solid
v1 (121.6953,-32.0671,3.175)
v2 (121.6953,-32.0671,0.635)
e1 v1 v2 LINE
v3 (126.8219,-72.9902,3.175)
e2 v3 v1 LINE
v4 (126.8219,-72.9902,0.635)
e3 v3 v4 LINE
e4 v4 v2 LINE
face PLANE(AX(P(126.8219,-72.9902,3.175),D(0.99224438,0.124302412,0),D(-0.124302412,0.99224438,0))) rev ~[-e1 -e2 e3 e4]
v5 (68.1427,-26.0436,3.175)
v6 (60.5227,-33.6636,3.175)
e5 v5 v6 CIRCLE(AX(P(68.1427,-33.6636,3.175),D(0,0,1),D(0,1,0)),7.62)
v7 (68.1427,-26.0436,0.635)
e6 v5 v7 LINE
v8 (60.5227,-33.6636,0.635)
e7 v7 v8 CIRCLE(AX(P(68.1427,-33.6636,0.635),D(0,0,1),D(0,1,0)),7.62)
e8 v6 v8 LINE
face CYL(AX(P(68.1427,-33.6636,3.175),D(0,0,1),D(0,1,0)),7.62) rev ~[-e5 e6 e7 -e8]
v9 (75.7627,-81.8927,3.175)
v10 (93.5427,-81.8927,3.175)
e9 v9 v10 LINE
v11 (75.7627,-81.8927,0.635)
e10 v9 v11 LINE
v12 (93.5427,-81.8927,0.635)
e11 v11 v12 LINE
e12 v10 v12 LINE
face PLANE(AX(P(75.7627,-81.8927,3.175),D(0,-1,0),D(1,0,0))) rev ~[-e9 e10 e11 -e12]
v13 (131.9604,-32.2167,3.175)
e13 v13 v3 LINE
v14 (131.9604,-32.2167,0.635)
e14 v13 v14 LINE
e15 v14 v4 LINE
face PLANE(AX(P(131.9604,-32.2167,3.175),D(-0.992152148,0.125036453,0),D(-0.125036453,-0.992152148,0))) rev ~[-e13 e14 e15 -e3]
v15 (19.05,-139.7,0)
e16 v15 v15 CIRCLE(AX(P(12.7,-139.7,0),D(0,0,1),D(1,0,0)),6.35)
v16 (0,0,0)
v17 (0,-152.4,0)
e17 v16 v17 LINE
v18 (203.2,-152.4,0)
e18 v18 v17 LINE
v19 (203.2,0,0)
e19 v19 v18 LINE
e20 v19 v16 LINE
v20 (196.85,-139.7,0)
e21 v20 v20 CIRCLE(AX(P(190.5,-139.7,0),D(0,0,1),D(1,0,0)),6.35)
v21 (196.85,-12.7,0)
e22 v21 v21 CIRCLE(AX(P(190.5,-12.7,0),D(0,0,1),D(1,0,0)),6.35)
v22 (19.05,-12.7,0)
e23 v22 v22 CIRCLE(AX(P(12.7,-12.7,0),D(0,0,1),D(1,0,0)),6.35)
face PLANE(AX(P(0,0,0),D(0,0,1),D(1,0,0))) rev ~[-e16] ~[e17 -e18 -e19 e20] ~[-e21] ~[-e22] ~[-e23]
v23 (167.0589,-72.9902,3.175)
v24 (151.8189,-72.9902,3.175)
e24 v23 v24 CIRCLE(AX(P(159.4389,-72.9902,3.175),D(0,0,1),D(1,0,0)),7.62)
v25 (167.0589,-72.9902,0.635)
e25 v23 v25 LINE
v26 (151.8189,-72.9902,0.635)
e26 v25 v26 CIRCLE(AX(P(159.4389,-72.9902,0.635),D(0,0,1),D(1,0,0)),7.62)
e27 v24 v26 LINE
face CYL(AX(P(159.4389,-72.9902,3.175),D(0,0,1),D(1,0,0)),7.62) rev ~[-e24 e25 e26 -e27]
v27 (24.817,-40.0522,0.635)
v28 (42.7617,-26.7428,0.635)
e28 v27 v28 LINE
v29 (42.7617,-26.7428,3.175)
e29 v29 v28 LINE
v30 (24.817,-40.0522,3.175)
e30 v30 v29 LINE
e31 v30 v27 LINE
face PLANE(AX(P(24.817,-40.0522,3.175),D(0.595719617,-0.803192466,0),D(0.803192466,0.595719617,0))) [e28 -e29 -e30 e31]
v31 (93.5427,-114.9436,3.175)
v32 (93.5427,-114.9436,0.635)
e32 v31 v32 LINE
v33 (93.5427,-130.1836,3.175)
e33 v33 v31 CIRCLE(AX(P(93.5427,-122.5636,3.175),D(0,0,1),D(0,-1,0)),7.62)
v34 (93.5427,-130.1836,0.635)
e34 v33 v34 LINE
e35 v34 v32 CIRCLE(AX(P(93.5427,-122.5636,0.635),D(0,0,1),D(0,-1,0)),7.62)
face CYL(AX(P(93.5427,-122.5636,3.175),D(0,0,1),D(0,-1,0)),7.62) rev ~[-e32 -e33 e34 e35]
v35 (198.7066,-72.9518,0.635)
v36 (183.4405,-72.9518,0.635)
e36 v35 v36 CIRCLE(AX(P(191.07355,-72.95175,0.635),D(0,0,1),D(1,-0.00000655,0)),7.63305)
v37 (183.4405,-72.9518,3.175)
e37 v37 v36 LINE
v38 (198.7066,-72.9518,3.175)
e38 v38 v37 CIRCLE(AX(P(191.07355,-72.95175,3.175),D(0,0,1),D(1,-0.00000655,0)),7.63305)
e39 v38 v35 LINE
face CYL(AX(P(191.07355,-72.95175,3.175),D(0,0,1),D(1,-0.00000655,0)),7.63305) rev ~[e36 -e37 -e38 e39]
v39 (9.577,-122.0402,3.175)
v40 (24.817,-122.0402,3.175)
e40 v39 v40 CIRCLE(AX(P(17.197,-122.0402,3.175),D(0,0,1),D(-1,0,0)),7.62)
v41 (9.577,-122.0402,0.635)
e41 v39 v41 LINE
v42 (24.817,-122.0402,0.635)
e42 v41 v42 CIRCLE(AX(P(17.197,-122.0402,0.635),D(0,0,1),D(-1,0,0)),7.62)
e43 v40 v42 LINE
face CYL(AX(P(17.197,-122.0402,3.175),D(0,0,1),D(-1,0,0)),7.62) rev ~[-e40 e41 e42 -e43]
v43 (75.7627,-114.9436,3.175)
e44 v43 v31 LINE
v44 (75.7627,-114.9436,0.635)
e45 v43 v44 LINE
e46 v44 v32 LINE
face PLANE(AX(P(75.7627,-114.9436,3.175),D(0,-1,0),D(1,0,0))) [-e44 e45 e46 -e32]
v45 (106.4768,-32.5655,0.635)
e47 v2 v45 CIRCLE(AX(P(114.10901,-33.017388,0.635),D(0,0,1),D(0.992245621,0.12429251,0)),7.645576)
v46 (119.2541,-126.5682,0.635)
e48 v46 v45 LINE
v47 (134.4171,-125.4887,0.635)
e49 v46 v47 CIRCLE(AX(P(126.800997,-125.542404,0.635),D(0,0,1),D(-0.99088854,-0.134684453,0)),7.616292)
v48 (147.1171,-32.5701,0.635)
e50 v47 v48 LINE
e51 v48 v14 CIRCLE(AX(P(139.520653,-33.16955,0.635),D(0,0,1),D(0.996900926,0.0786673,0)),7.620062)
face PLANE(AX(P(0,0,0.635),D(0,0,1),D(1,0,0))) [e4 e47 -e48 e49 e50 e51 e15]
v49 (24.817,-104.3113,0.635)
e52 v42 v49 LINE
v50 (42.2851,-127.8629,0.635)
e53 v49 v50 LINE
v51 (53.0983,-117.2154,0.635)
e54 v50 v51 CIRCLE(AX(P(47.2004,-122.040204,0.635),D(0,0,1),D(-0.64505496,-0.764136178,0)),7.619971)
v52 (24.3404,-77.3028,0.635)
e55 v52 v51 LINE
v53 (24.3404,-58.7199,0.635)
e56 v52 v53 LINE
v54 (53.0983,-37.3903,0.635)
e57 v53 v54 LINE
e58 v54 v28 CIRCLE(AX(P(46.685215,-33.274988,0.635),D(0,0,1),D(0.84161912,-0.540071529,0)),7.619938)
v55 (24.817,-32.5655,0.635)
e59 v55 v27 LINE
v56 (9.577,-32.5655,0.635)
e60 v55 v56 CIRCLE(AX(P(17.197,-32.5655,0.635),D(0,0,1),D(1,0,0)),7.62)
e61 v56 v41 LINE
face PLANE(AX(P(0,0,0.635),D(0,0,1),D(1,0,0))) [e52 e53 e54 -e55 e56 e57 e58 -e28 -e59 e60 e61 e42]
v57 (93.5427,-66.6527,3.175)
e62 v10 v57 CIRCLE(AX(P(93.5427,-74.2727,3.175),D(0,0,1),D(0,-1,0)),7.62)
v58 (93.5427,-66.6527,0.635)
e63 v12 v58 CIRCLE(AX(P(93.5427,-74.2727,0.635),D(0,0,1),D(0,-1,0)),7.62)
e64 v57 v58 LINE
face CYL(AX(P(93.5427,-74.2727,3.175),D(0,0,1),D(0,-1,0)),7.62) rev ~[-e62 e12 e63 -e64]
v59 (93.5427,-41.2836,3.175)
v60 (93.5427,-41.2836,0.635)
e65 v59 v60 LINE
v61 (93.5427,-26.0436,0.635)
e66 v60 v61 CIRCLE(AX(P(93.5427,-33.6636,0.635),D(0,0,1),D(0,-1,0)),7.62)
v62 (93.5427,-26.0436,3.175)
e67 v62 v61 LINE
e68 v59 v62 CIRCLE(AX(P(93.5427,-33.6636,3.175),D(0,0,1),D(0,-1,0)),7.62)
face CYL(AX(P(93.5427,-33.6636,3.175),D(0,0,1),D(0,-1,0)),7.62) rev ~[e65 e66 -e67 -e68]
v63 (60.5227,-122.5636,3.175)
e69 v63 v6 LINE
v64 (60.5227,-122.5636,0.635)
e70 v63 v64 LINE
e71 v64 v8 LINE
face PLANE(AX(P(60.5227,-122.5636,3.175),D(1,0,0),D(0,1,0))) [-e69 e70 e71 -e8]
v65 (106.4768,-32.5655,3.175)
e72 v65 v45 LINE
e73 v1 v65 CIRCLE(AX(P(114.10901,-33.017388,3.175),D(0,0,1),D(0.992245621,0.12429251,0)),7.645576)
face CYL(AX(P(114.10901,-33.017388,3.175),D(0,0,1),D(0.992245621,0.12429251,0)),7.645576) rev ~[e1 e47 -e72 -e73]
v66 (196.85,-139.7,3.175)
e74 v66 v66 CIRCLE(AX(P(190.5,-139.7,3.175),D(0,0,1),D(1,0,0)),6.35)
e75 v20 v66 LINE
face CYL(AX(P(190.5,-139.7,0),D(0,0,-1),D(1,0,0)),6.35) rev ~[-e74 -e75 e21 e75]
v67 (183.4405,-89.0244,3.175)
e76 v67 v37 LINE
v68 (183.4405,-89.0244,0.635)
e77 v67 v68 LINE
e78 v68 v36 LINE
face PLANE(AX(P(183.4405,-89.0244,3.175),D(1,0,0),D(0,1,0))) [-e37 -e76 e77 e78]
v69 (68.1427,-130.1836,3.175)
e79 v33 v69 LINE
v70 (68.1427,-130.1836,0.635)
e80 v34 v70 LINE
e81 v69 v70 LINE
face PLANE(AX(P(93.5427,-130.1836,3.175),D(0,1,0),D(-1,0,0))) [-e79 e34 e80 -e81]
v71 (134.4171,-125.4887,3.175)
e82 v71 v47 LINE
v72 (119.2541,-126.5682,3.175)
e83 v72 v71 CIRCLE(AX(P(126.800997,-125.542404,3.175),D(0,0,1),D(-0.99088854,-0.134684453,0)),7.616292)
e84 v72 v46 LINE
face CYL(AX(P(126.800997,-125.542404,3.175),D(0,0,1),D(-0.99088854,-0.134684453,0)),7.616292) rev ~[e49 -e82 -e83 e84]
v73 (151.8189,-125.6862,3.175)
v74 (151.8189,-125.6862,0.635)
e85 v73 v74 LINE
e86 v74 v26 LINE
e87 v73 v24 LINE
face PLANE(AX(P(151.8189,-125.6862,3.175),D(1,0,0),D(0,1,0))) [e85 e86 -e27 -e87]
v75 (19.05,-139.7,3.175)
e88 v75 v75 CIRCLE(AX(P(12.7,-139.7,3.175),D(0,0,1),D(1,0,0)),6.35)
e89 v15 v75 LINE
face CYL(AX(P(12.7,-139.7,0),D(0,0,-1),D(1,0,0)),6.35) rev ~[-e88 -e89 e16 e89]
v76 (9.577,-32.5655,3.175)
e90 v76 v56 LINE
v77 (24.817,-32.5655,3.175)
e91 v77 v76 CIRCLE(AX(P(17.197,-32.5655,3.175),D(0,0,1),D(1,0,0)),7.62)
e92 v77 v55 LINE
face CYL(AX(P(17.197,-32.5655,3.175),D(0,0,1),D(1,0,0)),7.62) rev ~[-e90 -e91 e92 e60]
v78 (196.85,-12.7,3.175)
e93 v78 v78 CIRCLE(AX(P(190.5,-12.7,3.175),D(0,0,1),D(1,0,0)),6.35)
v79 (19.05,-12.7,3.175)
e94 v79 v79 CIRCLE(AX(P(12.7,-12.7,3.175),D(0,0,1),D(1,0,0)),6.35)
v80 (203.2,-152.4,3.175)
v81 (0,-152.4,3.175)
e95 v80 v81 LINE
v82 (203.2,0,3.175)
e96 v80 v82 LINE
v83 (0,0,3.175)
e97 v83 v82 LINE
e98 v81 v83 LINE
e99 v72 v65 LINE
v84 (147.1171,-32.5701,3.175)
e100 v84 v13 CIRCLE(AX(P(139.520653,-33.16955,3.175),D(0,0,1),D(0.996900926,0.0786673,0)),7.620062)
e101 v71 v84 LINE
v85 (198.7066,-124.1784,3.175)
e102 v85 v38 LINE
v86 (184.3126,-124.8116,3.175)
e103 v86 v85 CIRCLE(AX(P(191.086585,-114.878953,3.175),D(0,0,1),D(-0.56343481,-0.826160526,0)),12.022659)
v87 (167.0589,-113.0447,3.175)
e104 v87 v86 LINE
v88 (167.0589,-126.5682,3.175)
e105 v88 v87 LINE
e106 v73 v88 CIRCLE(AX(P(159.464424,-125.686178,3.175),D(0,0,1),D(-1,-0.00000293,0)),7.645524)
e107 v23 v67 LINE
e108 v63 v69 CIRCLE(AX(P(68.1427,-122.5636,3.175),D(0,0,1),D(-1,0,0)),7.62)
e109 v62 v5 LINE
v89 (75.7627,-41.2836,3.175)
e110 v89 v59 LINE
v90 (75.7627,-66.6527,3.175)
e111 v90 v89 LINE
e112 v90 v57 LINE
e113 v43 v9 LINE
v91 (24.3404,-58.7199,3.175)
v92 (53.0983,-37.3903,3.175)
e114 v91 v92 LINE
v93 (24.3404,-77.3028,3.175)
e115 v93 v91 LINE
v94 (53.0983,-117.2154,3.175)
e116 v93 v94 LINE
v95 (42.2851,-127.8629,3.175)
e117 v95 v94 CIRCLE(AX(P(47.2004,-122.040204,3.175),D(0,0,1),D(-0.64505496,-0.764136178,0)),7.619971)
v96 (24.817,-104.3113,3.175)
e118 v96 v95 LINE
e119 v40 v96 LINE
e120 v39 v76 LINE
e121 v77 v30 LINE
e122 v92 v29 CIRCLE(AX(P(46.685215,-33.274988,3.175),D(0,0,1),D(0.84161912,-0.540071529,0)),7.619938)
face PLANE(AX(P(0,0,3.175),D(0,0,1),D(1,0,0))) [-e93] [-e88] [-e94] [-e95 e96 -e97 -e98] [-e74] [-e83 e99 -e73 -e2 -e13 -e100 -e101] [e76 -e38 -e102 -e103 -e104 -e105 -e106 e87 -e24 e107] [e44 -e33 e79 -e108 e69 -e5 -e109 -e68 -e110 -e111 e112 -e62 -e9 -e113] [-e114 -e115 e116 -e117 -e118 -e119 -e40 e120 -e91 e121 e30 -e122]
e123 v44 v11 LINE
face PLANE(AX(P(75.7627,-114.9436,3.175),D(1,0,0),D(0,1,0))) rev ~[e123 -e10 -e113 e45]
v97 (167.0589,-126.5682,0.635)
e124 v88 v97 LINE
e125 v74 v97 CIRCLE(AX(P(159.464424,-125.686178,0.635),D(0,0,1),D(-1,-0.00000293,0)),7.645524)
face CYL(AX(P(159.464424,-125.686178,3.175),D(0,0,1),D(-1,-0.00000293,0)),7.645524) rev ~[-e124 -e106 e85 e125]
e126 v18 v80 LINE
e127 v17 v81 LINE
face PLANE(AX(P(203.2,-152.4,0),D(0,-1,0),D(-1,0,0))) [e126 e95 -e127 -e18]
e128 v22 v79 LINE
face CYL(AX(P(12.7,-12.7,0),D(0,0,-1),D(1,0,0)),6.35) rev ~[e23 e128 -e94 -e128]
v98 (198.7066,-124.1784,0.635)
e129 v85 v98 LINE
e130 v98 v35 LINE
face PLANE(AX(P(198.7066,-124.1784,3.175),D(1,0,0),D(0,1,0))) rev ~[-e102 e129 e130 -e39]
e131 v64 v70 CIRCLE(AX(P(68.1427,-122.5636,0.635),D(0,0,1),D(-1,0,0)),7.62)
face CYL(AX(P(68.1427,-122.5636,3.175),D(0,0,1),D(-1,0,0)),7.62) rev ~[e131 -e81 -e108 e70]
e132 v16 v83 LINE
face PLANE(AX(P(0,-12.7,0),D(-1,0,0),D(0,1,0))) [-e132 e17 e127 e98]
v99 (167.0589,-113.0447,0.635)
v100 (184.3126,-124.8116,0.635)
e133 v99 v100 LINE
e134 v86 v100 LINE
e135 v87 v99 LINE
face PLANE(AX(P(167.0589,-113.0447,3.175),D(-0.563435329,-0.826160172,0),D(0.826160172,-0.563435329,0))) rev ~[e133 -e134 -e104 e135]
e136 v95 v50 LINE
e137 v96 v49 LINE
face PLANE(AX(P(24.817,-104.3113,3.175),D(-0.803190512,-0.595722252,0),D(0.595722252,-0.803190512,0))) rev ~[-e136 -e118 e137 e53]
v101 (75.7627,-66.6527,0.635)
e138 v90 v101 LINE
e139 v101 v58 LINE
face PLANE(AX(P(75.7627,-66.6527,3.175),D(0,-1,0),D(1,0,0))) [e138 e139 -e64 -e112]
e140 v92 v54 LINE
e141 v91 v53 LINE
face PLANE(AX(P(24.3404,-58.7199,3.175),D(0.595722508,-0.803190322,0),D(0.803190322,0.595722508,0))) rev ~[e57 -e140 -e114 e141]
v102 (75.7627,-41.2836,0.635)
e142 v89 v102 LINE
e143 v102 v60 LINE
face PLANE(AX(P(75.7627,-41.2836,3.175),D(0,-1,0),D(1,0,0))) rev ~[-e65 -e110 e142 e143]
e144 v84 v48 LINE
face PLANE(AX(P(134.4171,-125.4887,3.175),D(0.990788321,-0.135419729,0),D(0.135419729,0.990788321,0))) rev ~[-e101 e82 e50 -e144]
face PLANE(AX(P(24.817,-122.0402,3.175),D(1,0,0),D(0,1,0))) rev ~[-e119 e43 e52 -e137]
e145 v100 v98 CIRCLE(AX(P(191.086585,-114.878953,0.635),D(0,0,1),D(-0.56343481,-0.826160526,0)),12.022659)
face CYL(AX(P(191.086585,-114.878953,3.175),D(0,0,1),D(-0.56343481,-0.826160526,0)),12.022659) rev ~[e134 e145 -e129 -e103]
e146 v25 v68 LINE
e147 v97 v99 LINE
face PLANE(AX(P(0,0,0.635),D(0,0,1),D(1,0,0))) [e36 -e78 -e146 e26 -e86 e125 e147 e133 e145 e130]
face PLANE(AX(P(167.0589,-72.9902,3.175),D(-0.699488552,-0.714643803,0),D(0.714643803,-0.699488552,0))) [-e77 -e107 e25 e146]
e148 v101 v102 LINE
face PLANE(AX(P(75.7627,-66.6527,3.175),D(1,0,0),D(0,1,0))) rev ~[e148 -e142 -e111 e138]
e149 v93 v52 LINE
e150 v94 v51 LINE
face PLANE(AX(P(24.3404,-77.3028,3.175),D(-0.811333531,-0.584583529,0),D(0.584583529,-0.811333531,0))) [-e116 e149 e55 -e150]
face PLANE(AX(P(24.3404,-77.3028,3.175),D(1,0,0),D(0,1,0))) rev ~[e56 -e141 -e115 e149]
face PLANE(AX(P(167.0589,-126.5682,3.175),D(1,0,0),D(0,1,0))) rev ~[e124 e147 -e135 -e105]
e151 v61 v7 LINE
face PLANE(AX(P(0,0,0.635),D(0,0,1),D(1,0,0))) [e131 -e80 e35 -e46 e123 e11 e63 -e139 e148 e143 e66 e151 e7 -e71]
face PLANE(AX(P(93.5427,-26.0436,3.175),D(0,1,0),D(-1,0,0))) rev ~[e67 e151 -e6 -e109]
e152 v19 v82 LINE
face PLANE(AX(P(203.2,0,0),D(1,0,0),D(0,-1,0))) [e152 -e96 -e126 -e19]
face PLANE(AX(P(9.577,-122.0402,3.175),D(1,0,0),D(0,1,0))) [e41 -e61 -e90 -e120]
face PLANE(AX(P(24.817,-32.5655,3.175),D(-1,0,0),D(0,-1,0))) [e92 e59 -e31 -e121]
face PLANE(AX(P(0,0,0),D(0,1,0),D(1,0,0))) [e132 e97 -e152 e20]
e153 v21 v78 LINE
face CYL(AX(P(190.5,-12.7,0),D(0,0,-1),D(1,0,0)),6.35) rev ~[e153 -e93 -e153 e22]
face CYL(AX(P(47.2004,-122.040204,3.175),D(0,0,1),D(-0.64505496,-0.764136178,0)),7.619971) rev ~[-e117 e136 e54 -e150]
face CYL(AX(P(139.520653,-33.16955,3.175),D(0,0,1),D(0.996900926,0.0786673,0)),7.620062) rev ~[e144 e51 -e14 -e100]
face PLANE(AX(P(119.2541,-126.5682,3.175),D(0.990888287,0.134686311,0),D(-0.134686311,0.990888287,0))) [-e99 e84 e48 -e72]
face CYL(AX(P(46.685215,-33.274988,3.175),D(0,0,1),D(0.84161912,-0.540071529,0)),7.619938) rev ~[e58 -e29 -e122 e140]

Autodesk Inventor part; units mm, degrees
ref_plane "YZ Plane" through (0, 0, 0) normal (1, 0, 0) x (0, 1, 0)
ref_plane "XZ Plane" through (0, 0, 0) normal (0, 1, 0) x (-1, 0, 0)
ref_plane "XY Plane" through (0, 0, 0) normal (0, 0, 1) x (1, 0, 0)
sketch "Sketch1" plane through (0, 0, 0) normal (0, 0, 1) x (1, 0, 0)
  line L0 (0, 0) -> (203.2, 0)
  line L1 (203.2, 0) -> (203.2, -152.4)
  line L2 (203.2, -152.4) -> (0, -152.4)
  line L3 (0, -152.4) -> (0, 0)
  line L4 (0, 0) -> (12.7, 0)
  line L5 (0, -12.7) -> (0, 0)
  line L6 (0, -152.4) -> (0, -139.7)
  line L7 (203.2, 0) -> (190.5, 0)
  line L8 (203.2, -152.4) -> (203.2, -139.7)
  circle A0 centre (12.7, -12.7) radius 6.35
  circle A1 centre (190.5, -12.7) radius 6.35
  circle A2 centre (190.5, -139.7) radius 6.35
  circle A3 centre (12.7, -139.7) radius 6.35
extrude "Extrusion1" add sketch "Sketch1" along normal blind 3.175
sketch "Sketch2" plane through (0, 0, 3.175) normal (0, 0, 1) x (1, 0, 0)
  arc A0 (24.817, -32.5655) -> (9.577, -32.5655) centre (17.197, -32.5655) ccw
  arc A1 (9.577, -122.0402) -> (24.817, -122.0402) centre (17.197, -122.0402) ccw
  line L0 (9.577, -32.5655) -> (9.577, -122.0402)
  line L1 (9.577, -42.2151) -> (9.577, -32.5655)
  arc A2 (53.0983, -37.3903) -> (42.7617, -26.7428) centre (46.6851, -33.275) ccw
  arc A3 (49.095, -40.7739) -> (42.7617, -26.7428) centre (46.7521, -33.3865) ccw
  line L2 (42.7617, -26.7428) -> (24.817, -40.0522)
  line L3 (53.0983, -37.3903) -> (24.3404, -58.7199)
  arc A4 (42.2851, -127.8629) -> (53.0983, -117.2154) centre (47.2004, -122.0402) ccw
  line L4 (53.0983, -117.2154) -> (24.3404, -77.3028)
  line L5 (42.2851, -127.8629) -> (24.817, -104.3113)
  line L6 (24.817, -104.3113) -> (24.817, -122.0402)
  line L7 (24.3404, -58.7199) -> (24.3404, -77.3028)
  line L8 (24.817, -40.0522) -> (24.817, -32.5655)
  line L9 (60.5227, -33.6636) -> (60.5227, -122.5636)
  line L10 (68.1427, -130.1836) -> (93.5427, -130.1836)
  line L11 (93.5427, -114.9436) -> (75.7627, -114.9436)
  line L12 (68.1427, -26.0436) -> (93.5427, -26.0436)
  line L13 (93.5427, -41.2836) -> (75.7627, -41.2836)
  arc A5 (68.1427, -26.0436) -> (60.5227, -33.6636) centre (68.1427, -33.6636) ccw
  arc A6 (60.5227, -122.5636) -> (68.1427, -130.1836) centre (68.1427, -122.5636) ccw
  arc A7 (93.5427, -130.1836) -> (93.5427, -114.9436) centre (93.5427, -122.5636) ccw
  arc A8 (93.5427, -41.2836) -> (93.5427, -26.0436) centre (93.5427, -33.6636) ccw
  arc A9 (93.5427, -81.8927) -> (93.5427, -66.6527) centre (93.5427, -74.2727) ccw
  line L14 (93.5427, -66.6527) -> (75.7627, -66.6527)
  line L15 (93.5427, -81.8927) -> (75.7627, -81.8927)
  line L16 (75.7627, -41.2836) -> (75.7627, -66.6527)
  line L17 (75.7627, -81.8927) -> (75.7627, -114.9436)
  line L18 (147.1171, -32.5701) -> (134.4171, -125.4887)
  line L19 (106.4768, -32.5655) -> (119.2541, -126.5682)
  line L20 (121.6953, -32.0671) -> (126.8219, -72.9902)
  line L21 (126.8219, -72.9902) -> (131.9604, -32.2167)
  arc A10 (147.1171, -32.5701) -> (131.9604, -32.2167) centre (139.5207, -33.1695) ccw
  arc A11 (119.2541, -126.5682) -> (134.4171, -125.4887) centre (126.801, -125.5424) ccw
  arc A12 (121.6953, -32.0671) -> (106.4768, -32.5655) centre (114.109, -33.0174) ccw
  line L22 (151.8189, -72.9902) -> (151.8189, -126.5682)
  arc A13 (167.0589, -72.9902) -> (151.8189, -72.9902) centre (159.4389, -72.9902) ccw
  arc A14 (151.8189, -125.6862) -> (167.0589, -126.5682) centre (159.4644, -125.6862) ccw
  line L23 (198.7066, -72.9518) -> (198.7066, -124.1784)
  line L24 (184.3126, -124.8116) -> (167.0589, -113.0447)
  line L25 (183.4405, -72.9518) -> (183.4405, -89.0244)
  line L26 (183.4405, -89.0244) -> (167.0589, -72.9902)
  line L27 (167.0589, -113.0447) -> (167.0589, -126.5682)
  arc A15 (198.7066, -72.9518) -> (183.4405, -72.9518) centre (191.0735, -72.9518) ccw
  arc A16 (184.3126, -124.8116) -> (198.7066, -124.1784) centre (191.0866, -114.8789) ccw
  point P0 (0, 0)
emboss "Emboss1" sketch "Sketch2" operation cut depth 2.54 direction (0, 0, -1)
properties part number "NamePlate"
